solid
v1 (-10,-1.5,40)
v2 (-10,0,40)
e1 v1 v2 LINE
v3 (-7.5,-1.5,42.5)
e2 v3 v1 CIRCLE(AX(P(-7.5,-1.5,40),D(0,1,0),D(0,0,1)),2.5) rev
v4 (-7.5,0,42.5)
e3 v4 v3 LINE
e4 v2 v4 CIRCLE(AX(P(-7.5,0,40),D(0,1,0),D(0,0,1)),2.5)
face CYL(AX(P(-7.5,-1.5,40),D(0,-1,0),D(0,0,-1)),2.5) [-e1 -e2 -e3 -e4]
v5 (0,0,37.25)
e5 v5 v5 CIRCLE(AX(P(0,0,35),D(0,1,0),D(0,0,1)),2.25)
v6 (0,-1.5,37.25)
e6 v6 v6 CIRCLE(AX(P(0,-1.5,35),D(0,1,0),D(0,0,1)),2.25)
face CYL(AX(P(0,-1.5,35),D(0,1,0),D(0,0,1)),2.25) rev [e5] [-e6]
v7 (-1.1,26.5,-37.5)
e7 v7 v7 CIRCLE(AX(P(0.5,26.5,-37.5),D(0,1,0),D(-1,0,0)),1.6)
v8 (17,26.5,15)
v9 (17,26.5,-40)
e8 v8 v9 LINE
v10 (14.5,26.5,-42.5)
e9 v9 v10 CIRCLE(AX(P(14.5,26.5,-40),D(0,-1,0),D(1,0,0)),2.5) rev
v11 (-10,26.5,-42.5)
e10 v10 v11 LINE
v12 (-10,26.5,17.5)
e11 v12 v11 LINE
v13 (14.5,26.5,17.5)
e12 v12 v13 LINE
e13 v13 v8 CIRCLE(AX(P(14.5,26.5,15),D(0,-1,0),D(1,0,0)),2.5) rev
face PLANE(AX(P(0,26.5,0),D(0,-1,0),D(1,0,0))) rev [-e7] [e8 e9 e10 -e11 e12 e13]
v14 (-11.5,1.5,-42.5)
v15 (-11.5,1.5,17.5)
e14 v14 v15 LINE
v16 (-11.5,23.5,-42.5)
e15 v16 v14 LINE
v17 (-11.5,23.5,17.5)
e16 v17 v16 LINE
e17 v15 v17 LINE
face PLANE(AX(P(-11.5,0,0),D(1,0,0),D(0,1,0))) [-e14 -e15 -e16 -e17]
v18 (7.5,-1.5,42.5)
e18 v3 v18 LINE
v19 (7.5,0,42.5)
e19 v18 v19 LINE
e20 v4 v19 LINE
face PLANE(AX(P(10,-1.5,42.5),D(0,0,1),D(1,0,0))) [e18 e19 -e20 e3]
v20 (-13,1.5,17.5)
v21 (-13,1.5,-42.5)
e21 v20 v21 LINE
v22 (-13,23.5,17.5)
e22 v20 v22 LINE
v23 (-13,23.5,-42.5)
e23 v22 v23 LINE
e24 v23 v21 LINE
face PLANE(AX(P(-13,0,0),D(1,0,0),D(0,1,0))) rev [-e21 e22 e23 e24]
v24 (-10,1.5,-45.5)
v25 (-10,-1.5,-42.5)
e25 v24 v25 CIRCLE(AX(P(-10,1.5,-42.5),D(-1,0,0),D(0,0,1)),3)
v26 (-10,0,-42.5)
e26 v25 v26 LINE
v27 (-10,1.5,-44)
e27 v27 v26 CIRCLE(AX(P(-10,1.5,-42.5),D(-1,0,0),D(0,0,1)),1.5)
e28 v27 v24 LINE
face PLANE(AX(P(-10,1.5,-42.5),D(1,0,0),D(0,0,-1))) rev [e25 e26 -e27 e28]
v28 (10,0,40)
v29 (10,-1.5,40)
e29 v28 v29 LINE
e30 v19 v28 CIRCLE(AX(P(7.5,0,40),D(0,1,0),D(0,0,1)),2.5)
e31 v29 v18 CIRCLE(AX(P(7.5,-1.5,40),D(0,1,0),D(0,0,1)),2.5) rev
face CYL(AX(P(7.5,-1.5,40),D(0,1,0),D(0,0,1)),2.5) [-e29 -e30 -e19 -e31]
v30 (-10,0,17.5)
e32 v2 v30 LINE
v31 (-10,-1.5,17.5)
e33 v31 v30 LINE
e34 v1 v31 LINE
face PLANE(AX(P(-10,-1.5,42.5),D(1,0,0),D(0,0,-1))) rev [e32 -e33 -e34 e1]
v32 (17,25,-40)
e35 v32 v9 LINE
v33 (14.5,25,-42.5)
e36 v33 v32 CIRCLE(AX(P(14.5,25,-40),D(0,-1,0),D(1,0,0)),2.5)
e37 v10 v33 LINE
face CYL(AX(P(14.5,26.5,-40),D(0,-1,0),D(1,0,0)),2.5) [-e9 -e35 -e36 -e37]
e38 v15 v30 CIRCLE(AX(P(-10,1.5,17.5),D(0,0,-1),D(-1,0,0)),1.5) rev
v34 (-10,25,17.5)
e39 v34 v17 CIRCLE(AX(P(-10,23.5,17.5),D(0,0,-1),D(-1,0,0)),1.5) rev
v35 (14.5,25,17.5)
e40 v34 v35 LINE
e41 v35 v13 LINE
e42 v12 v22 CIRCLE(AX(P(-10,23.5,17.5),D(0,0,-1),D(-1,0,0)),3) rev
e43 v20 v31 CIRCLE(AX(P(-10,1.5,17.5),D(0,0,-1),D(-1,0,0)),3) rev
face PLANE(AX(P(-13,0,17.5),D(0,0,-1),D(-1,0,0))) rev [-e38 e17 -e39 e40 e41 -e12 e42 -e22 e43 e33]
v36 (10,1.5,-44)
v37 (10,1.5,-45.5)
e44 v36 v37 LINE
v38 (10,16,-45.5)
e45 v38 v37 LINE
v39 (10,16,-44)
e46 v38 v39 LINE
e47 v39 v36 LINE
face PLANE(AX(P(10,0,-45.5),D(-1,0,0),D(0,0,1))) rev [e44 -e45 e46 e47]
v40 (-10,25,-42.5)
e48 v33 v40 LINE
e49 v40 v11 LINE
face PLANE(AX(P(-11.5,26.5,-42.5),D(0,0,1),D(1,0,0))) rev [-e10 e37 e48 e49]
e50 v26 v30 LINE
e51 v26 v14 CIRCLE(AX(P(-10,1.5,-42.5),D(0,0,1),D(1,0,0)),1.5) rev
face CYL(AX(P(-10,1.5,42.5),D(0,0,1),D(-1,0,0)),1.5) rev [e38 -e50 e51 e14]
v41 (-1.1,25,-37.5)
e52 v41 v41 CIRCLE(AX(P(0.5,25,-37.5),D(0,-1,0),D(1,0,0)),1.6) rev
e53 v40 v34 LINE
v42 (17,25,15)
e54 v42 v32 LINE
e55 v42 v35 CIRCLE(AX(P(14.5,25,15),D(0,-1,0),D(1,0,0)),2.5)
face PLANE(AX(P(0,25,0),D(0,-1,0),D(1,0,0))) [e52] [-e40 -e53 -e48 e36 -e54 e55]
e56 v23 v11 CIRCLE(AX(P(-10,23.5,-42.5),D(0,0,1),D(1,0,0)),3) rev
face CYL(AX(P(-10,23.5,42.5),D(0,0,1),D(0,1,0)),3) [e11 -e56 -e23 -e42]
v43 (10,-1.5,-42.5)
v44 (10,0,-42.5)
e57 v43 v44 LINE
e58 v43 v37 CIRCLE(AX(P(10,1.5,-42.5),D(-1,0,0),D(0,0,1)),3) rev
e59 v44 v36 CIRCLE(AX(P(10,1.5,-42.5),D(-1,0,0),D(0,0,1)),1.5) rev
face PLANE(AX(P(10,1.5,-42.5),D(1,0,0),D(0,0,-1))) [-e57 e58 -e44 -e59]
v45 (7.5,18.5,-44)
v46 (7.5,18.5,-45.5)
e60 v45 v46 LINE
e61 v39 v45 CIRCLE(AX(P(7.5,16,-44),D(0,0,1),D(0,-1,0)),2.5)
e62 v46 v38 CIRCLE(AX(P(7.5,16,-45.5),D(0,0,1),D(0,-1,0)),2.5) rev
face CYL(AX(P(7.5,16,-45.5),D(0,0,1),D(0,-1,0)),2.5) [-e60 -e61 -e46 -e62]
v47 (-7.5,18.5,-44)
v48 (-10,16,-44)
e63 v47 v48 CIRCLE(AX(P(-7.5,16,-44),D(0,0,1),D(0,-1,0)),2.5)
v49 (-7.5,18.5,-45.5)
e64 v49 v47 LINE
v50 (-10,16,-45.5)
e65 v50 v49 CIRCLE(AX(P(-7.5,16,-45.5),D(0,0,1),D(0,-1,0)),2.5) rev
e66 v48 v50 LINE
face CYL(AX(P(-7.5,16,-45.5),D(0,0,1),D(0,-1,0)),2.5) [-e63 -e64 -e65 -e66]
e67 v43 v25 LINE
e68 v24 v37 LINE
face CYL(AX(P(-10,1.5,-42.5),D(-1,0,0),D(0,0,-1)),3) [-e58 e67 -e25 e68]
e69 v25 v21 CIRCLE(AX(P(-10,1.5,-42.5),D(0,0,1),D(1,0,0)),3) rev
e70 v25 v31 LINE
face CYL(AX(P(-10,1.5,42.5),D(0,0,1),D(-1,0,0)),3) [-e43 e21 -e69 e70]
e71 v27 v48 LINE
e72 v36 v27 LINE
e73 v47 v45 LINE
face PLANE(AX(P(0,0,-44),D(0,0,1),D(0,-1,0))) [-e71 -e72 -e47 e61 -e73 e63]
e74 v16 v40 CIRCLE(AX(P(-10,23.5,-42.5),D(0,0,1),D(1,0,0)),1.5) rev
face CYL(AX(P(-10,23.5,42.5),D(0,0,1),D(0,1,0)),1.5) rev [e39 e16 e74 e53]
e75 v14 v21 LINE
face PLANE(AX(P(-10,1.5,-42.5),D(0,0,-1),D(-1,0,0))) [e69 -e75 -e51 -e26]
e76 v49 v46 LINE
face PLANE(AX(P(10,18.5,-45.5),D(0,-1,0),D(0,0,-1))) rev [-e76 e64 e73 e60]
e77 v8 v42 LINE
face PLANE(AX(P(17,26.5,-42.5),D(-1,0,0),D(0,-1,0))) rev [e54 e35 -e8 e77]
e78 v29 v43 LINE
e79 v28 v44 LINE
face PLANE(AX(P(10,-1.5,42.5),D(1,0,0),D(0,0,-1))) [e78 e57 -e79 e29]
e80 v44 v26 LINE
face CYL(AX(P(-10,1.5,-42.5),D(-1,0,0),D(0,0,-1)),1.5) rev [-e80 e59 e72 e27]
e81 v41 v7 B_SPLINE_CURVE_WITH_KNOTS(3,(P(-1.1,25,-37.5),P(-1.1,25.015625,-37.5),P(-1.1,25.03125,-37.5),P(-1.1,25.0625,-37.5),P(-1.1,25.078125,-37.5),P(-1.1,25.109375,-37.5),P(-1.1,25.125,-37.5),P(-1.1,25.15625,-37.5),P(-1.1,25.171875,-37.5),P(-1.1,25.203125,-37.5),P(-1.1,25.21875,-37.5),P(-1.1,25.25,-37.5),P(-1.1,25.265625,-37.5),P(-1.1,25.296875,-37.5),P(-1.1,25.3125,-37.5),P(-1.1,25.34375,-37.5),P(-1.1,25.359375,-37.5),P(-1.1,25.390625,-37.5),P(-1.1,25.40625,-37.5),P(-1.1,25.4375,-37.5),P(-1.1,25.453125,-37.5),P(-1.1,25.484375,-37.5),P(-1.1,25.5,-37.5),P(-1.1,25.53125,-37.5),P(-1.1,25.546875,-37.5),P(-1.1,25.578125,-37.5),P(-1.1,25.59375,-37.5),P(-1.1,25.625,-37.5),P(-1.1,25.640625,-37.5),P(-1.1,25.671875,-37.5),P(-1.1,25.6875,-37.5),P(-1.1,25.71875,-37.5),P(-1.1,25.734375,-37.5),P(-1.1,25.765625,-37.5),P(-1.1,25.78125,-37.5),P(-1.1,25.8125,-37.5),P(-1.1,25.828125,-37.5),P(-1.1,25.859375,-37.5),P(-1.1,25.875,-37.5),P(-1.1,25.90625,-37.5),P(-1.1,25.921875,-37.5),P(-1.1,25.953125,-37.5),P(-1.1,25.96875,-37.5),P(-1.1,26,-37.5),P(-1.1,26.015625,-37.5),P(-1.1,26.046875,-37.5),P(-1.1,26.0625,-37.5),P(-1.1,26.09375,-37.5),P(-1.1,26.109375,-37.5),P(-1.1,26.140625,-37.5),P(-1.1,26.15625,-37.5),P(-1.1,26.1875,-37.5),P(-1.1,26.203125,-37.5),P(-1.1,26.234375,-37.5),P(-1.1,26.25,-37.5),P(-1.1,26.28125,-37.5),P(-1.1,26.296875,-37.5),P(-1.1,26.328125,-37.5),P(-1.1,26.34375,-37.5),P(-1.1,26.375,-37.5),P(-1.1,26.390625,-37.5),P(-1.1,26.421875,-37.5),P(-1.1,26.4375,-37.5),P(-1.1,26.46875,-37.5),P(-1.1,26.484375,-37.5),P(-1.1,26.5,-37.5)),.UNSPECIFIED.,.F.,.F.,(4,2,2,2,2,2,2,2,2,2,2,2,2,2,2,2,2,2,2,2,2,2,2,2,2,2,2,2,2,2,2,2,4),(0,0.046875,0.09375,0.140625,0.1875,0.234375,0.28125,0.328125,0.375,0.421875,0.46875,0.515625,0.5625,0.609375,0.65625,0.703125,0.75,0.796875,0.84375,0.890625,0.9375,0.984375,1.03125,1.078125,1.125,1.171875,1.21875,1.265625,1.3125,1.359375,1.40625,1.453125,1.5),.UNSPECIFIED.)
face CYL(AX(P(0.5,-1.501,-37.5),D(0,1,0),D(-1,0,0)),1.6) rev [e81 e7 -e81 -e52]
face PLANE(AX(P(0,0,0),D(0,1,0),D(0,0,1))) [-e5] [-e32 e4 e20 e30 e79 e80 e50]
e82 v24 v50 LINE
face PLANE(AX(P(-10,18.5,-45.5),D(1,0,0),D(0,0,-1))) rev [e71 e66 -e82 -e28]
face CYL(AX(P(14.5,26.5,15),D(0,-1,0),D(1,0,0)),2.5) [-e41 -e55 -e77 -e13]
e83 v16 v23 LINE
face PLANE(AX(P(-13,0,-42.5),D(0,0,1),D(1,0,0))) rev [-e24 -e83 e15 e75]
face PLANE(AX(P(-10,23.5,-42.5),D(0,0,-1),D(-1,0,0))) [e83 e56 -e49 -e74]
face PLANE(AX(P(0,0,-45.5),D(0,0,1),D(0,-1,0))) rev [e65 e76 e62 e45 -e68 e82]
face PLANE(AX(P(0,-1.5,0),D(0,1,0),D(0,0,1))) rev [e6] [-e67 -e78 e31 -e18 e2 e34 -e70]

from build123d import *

# Parameters (mm, degrees)
SKETCH1_W                    = 20
SKETCH1_H                    = 85
BASE_FLANGE1_DEPTH           = 1.5
EDGE_FLANGE1_DEPTH           = 85
EDGE_FLANGE2_STRIP_W         = 9
EDGE_FLANGE2_STRIP_H         = 1.5
EDGE_FLANGE2_STRIP_CUT_DEPTH = 85
EDGE_FLANGE2_DEPTH           = 85
CUT_EXTRUDE1_DEPTH           = 53.891398166
CUT_EXTRUDE1_DEPTH_BACK      = 53.891398166
SKETCH13_W                   = 25
SKETCH13_H                   = 26.5
CUT_EXTRUDE2_DEPTH           = 53.891398166
CUT_EXTRUDE2_DEPTH_BACK      = 53.891398166
SKETCH14_W                   = 2.598076211
SKETCH14_H                   = 25
SKETCH15_R                   = 2.25
CAGE_MOUNTING_HOLE_DEPTH     = 53.891398166
EDGE_FLANGE3_DEPTH           = 20
ARDUINO_MOUNTING_HOLE_REACH  = 58.065
SKETCH19_R                   = 1.6
FILLET1_R                    = 2.5


# Sheet-metal steps are written as plain solids
with BuildPart() as part:
    # Sketch1 → Base-Flange1 (new body)
    with BuildSketch(Plane(origin=(0, 0, 0), x_dir=(1, 0, 0), z_dir=(0, 1, 0))):
        Rectangle(SKETCH1_W, SKETCH1_H)
    extrude(amount=-BASE_FLANGE1_DEPTH)

    # Edge-Flange1 section (across the edge) → Edge-Flange1 (add)
    with BuildSketch(Plane(origin=(-11.5, 0, -42.5), x_dir=(1, 0, 0), z_dir=(0, 0, 1))):
        with BuildLine():
            Line((-1.5, 1.5), (-1.5, 25))
            Line((-1.5, 25), (0, 25))
            Line((0, 25), (0, 1.5))
            ThreePointArc((0, 1.5), (0.439339828, 0.439339828), (1.5, 0))
            Line((1.5, 0), (1.5, -1.5))
            ThreePointArc((1.5, -1.5), (-0.621320344, -0.621320344), (-1.5, 1.5))
        make_face()
    extrude(amount=EDGE_FLANGE1_DEPTH)

    # Edge-Flange2 strip (across the edge) → Edge-Flange2 strip cut (cut)
    with BuildSketch(Plane(origin=(-11.5, 25, -42.5), x_dir=(0, -1, 0), z_dir=(0, 0, 1))):
        with Locations((-3, -0.75)):
            Rectangle(EDGE_FLANGE2_STRIP_W, EDGE_FLANGE2_STRIP_H)
    extrude(amount=EDGE_FLANGE2_STRIP_CUT_DEPTH, mode=Mode.SUBTRACT)

    # Edge-Flange2 section (across the edge) → Edge-Flange2 (add)
    with BuildSketch(Plane(origin=(-11.5, 25, -42.5), x_dir=(0, -1, 0), z_dir=(0, 0, 1))):
        with BuildLine():
            Line((-1.5, 1.5), (-1.5, 28.5))
            Line((-1.5, 28.5), (0, 28.5))
            Line((0, 28.5), (0, 1.5))
            ThreePointArc((0, 1.5), (0.439339828, 0.439339828), (1.5, 0))
            Line((1.5, 0), (1.5, -1.5))
            ThreePointArc((1.5, -1.5), (-0.621320344, -0.621320344), (-1.5, 1.5))
        make_face()
    extrude(amount=EDGE_FLANGE2_DEPTH)

    # Sketch13 → Cut-Extrude1 (cut, two sides: drawn at the far end of the back side and taken through both)
    with BuildSketch(Plane(origin=(0, 0, 0), x_dir=(0, 0, -1), z_dir=(1, 0, 0)).offset(-CUT_EXTRUDE1_DEPTH_BACK)):
        with Locations((-30, 13.25)):
            Rectangle(SKETCH13_W, SKETCH13_H)
    extrude(amount=CUT_EXTRUDE1_DEPTH + CUT_EXTRUDE1_DEPTH_BACK, mode=Mode.SUBTRACT)

    # Sketch14 → Cut-Extrude2 (cut, two sides: drawn at the far end of the back side and taken through both)
    with BuildSketch(Plane(origin=(0, 0, 0), x_dir=(1, 0, 0), z_dir=(0, 1, 0)).offset(-CUT_EXTRUDE2_DEPTH_BACK)):
        with Locations((-11.299038105, -30)):
            Rectangle(SKETCH14_W, SKETCH14_H)
    extrude(amount=CUT_EXTRUDE2_DEPTH + CUT_EXTRUDE2_DEPTH_BACK, mode=Mode.SUBTRACT)

    # Sketch15 → cage mounting hole (cut, through all)
    with BuildSketch(Plane(origin=(0, 0, 0), x_dir=(1, 0, 0), z_dir=(0, 1, 0))):
        with Locations(Location((0, -35, 0), (0, 0, 270))):
            Circle(SKETCH15_R)
    extrude(amount=-CAGE_MOUNTING_HOLE_DEPTH, mode=Mode.SUBTRACT)

    # Edge-Flange3 section (across the edge) → Edge-Flange3 (add)
    with BuildSketch(Plane(origin=(10, 0, -44), x_dir=(0, 0, 1), z_dir=(-1, 0, 0))):
        with BuildLine():
            Line((-1.5, 1.5), (-1.5, 18.5))
            Line((-1.5, 18.5), (0, 18.5))
            Line((0, 18.5), (0, 1.5))
            ThreePointArc((0, 1.5), (0.439339828, 0.439339828), (1.5, 0))
            Line((1.5, 0), (1.5, -1.5))
            ThreePointArc((1.5, -1.5), (-0.621320344, -0.621320344), (-1.5, 1.5))
        make_face()
    extrude(amount=EDGE_FLANGE3_DEPTH)

    # Sketch19 → arduino mounting hole (cut, up to next)
    with BuildSketch(Plane(origin=(0, 26.5, 0), x_dir=(1, 0, 0), z_dir=(0, 1, 0)), mode=Mode.PRIVATE) as arduino_mounting_hole_sk1:
        with Locations(Location((0.5, 37.5, 0), (0, 0, 180))):
            Circle(SKETCH19_R)
    arduino_mounting_hole_tool1 = extrude(arduino_mounting_hole_sk1.sketch, amount=-ARDUINO_MOUNTING_HOLE_REACH, mode=Mode.PRIVATE) & part.part
    add(arduino_mounting_hole_tool1.solids().sort_by_distance((0.5, 26.5, -37.5))[0], mode=Mode.SUBTRACT)

    # Fillet1
    fillet1_edges = [part.edges().sort_by_distance(p)[0] for p in [
        (10, 18.5, -44.75),
        (-10, 18.5, -44.75),
        (17, 25.75, -42.5),
        (17, 25.75, 17.5),
        (10, -0.75, 42.5),
        (-10, -0.75, 42.5),
    ]]
    fillet(fillet1_edges, radius=FILLET1_R)


solid = part.part
